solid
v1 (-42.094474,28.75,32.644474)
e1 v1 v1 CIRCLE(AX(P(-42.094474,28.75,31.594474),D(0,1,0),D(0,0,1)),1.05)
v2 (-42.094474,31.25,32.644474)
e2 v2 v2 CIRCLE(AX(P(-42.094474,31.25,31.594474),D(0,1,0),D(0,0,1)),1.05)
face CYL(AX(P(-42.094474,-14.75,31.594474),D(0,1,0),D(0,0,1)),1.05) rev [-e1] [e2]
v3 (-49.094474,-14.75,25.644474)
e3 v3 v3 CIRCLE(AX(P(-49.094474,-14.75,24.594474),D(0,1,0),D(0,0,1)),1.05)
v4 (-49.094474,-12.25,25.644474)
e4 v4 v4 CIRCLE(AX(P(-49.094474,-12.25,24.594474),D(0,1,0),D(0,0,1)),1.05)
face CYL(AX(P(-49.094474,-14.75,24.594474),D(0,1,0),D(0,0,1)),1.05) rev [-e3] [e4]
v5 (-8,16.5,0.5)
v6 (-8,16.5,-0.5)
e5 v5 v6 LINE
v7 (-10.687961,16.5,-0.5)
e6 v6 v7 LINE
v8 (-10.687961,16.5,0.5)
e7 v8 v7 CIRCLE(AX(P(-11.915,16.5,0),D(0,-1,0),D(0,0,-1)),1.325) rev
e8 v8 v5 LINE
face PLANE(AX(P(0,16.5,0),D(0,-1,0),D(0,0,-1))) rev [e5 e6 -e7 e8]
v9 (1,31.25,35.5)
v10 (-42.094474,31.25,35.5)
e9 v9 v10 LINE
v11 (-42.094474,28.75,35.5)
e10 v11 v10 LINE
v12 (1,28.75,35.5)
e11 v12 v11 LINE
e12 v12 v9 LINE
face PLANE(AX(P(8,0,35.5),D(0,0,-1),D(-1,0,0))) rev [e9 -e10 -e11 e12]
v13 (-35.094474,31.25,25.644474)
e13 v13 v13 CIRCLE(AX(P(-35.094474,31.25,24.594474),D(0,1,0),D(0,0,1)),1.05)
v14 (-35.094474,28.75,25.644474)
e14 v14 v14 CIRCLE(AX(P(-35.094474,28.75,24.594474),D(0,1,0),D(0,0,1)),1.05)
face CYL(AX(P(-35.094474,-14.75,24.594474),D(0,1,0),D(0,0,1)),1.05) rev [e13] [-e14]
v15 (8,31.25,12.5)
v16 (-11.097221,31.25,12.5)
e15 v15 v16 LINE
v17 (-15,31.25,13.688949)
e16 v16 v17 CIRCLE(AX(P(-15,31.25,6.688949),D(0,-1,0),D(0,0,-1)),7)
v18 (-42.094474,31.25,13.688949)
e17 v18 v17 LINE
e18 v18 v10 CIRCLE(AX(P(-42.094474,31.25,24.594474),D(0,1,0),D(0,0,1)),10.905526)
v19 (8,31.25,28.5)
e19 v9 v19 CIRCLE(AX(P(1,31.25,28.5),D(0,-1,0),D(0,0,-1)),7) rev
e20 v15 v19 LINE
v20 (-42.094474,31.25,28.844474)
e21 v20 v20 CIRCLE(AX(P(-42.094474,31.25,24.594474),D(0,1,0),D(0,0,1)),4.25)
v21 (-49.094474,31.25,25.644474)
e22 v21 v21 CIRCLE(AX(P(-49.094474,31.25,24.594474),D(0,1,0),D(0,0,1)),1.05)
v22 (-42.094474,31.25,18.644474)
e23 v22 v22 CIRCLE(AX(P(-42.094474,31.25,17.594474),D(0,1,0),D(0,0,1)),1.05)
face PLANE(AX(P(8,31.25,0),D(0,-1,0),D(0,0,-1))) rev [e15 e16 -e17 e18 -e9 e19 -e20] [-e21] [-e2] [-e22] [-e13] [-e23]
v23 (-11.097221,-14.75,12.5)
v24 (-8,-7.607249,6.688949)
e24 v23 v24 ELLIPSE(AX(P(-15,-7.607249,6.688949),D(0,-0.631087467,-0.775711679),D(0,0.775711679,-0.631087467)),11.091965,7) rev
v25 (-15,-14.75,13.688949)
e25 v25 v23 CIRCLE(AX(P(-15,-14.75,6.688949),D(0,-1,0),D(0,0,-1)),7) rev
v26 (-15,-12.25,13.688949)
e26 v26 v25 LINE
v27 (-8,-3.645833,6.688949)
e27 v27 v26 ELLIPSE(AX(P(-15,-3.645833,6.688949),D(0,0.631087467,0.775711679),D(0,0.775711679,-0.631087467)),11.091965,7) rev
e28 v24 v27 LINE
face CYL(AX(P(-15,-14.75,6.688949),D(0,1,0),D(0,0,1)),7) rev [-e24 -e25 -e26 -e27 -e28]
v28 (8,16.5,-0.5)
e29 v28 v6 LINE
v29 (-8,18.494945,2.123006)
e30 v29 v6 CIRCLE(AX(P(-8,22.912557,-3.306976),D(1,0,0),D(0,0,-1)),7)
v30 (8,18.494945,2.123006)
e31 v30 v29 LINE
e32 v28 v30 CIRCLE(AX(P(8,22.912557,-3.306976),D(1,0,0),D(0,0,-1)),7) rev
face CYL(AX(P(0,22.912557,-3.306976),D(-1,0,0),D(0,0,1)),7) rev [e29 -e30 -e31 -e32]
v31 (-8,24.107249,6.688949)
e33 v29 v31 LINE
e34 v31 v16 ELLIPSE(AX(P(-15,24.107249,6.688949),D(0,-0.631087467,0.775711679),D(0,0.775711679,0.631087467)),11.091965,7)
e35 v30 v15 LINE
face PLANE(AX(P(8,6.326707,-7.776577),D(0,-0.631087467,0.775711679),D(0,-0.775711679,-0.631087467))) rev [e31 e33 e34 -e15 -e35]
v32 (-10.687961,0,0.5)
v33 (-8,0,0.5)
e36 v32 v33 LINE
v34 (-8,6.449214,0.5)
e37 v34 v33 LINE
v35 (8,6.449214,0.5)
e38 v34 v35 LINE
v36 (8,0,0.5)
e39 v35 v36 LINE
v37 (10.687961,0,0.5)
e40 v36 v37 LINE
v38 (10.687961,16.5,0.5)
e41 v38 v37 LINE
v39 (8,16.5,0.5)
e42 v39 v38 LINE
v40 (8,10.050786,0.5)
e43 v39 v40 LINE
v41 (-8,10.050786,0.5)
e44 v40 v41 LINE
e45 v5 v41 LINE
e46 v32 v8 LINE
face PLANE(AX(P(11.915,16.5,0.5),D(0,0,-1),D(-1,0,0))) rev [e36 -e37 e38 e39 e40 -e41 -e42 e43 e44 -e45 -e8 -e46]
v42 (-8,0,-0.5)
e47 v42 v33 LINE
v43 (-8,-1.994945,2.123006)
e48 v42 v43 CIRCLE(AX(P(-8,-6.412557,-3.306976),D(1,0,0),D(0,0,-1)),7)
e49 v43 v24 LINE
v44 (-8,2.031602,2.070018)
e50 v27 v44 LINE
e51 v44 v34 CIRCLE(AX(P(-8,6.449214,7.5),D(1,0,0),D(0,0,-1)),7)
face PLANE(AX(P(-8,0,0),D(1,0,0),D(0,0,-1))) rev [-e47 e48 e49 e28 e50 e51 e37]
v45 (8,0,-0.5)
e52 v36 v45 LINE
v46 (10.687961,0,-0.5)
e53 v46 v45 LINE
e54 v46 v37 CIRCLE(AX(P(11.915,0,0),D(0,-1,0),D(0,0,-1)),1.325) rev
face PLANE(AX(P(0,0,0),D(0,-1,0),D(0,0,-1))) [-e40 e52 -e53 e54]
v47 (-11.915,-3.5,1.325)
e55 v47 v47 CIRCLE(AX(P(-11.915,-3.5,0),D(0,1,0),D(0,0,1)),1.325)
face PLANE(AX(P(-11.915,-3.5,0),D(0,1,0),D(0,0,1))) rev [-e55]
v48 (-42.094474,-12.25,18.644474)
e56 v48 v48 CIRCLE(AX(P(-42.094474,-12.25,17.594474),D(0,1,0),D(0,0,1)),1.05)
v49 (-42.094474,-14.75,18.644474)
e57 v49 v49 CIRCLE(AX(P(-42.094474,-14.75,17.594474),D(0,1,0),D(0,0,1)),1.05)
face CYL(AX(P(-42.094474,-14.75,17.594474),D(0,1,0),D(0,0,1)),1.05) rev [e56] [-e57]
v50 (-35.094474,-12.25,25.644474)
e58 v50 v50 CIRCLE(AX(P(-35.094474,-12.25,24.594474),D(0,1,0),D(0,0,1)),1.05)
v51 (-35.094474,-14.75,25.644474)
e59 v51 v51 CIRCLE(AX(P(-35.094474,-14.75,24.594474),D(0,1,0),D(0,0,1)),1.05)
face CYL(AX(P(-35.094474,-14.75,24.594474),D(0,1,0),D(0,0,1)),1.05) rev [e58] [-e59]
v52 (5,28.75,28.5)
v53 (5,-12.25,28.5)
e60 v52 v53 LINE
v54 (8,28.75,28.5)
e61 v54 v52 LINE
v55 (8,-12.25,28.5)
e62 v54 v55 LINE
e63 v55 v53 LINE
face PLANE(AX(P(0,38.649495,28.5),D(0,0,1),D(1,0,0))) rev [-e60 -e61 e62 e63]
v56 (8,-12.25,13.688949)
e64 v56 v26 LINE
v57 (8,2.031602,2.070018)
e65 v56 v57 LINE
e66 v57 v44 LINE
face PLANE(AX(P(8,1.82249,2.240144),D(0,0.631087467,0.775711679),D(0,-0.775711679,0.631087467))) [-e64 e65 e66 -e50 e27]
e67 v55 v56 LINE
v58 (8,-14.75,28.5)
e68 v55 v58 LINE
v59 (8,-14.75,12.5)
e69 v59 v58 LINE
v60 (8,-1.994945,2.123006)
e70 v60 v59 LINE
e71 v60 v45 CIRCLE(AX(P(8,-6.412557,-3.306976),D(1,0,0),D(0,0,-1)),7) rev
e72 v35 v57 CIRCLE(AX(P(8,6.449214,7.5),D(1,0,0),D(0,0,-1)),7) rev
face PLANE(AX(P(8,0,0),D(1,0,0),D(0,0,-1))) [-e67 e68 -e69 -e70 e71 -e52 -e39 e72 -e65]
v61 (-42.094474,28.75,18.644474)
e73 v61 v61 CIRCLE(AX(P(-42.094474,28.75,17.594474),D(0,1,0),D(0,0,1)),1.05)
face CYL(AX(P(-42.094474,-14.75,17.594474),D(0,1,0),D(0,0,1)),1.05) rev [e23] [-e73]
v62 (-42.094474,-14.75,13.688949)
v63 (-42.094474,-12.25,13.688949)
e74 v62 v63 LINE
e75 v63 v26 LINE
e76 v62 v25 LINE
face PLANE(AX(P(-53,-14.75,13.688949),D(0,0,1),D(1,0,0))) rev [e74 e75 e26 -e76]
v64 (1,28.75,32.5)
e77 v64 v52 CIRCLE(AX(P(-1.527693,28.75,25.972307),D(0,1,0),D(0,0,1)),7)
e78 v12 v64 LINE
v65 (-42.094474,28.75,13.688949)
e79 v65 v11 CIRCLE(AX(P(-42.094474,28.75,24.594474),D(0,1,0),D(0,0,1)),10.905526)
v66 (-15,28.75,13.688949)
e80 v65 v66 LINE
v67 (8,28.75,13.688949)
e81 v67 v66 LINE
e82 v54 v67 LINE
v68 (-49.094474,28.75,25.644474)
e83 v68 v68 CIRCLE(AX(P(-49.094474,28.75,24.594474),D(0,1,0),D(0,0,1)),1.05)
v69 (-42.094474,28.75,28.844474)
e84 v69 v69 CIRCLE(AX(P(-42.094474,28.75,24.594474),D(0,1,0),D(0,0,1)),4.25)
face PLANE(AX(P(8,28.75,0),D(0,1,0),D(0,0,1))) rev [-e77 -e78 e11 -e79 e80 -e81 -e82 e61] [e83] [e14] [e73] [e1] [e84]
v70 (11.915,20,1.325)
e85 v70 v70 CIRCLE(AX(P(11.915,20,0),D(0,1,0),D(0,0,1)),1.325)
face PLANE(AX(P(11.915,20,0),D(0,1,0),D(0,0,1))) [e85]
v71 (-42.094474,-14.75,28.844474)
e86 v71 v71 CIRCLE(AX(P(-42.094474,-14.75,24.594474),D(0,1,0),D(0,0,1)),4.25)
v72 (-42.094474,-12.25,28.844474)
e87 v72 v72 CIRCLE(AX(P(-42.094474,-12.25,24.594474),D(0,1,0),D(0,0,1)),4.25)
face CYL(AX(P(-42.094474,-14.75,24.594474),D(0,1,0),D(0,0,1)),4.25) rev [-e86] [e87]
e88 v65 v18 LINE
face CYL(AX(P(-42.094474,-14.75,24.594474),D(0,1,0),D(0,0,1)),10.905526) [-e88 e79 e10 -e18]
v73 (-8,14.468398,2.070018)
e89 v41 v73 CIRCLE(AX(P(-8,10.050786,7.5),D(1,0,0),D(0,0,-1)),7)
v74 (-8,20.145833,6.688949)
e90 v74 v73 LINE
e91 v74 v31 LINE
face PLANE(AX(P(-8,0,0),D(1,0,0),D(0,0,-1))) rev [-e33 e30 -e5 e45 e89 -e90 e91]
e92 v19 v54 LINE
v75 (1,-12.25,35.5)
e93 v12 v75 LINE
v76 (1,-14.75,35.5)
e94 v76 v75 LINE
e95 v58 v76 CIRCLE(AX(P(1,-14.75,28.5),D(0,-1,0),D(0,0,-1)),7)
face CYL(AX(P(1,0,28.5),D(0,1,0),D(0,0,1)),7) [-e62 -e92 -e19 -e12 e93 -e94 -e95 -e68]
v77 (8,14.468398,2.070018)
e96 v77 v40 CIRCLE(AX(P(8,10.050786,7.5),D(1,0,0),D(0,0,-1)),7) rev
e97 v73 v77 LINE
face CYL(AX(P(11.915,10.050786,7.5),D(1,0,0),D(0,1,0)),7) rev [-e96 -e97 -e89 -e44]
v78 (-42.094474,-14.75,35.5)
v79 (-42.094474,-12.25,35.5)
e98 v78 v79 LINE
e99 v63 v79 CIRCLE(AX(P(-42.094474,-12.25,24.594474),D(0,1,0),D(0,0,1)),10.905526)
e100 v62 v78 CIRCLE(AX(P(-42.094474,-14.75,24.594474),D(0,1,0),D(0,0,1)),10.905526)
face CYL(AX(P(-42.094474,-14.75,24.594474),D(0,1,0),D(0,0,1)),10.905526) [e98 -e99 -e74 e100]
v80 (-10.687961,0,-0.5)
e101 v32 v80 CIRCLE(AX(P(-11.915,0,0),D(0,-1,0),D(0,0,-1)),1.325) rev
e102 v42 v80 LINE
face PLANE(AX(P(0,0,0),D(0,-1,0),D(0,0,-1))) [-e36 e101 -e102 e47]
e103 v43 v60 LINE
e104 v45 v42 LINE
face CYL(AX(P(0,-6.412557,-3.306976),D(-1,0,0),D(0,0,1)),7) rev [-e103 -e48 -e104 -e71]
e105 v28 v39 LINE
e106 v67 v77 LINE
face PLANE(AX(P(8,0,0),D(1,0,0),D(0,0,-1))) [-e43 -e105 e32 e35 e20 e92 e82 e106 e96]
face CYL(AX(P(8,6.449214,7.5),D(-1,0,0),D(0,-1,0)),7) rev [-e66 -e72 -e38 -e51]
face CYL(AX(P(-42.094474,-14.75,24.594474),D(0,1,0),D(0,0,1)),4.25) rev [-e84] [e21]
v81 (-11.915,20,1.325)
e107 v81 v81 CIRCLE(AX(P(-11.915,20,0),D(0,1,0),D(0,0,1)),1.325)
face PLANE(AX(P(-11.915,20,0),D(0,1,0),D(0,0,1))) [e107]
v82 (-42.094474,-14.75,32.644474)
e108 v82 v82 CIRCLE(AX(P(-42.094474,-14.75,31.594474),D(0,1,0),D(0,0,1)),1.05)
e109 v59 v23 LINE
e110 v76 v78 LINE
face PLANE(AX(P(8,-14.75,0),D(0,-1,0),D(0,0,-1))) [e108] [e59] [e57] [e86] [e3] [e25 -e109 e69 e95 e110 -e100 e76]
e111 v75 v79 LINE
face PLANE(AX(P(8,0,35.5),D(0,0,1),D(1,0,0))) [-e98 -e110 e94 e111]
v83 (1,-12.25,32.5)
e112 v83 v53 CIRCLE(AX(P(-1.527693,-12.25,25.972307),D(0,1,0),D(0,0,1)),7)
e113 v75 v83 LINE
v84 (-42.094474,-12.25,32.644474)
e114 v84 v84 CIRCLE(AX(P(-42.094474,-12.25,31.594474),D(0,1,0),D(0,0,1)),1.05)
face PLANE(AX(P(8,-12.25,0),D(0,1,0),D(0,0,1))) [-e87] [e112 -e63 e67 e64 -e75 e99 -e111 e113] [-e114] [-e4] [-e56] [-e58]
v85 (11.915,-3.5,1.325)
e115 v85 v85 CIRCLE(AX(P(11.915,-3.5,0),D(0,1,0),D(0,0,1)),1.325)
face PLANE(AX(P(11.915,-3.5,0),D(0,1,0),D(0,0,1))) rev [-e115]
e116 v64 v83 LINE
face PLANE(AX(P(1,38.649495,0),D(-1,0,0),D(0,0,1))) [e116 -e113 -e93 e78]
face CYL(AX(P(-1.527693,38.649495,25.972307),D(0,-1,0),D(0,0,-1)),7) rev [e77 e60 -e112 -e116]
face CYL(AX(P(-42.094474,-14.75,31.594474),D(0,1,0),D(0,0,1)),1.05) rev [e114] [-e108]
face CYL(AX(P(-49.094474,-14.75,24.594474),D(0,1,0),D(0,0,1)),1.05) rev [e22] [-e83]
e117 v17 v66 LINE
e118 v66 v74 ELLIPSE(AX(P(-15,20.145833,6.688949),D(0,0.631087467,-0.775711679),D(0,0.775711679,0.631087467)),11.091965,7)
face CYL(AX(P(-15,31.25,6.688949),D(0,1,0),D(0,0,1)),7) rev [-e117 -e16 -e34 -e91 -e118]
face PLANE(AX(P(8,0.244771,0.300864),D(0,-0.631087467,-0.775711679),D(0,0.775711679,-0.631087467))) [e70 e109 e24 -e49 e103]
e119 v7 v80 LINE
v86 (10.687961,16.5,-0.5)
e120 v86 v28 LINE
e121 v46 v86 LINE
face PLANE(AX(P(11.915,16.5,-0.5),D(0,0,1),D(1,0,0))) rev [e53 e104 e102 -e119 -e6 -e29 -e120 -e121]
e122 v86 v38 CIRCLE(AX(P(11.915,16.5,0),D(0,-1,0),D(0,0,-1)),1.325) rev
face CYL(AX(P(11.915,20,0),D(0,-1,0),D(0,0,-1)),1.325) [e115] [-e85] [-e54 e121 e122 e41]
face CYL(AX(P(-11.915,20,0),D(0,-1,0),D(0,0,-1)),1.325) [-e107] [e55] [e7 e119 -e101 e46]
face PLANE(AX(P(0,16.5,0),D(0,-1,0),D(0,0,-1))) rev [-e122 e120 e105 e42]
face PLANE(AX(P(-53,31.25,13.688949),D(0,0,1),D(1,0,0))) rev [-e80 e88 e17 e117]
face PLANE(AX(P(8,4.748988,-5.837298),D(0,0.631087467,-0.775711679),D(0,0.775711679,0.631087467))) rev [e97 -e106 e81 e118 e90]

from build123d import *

# Parameters (mm, degrees)
SKETCH1_W           = 23.83
SKETCH1_H           = 1
BOSS_EXTRUDE1_DEPTH = 16.5
SKETCH2_R           = 1.325
BOSS_EXTRUDE2_DEPTH = 11.75
BOSS_EXTRUDE4_DEPTH = 8
SKETCH5_W           = 21.811051378
SKETCH5_H           = 2.5
BOSS_EXTRUDE5_DEPTH = 45
SKETCH6_R           = 4.25
SKETCH6_R_2         = 1.05
CUT_EXTRUDE1_DEPTH  = 79.646360374
FILLET1_R           = 7
FILLET2_R           = 7
FILLET3_R           = 7
BOSS_EXTRUDE6_START = 41
BOSS_EXTRUDE6_DEPTH = 41


with BuildPart() as part:
    # Sketch1 → Boss-Extrude1 (new body)
    with BuildSketch(Plane(origin=(0, 0, 0), x_dir=(1, 0, 0), z_dir=(0, 1, 0))):
        Rectangle(SKETCH1_W, SKETCH1_H)
    extrude(amount=BOSS_EXTRUDE1_DEPTH)

    # Sketch2 → Boss-Extrude2 (add, symmetric)
    with BuildSketch(Plane(origin=(0, 8.25, 0), x_dir=(1, 0, 0), z_dir=(0, 1, 0))):
        with Locations(Location((-11.915, 0, 0), (0, 0, 270))):
            Circle(SKETCH2_R)
        with Locations(Location((11.915, 0, 0), (0, 0, 270))):
            Circle(SKETCH2_R)
    extrude(amount=BOSS_EXTRUDE2_DEPTH, both=True)

    # Sketch4 → Boss-Extrude4 (add, symmetric)
    with BuildSketch(Plane(origin=(0, 0, 0), x_dir=(0, 0, -1), z_dir=(1, 0, 0))):
        Polygon((-0.5, 12.538583985), (-0.5, 16.5), (-12.5, 31.25), (-35.5, 31.25), (-35.5, 28.75), (-13.688948622, 28.75), align=None)
        Polygon((-0.5, 0), (-0.5, 3.961416015), (-13.688948622, -12.25), (-35.5, -12.25), (-35.5, -14.75), (-12.5, -14.75), align=None)
    extrude(amount=BOSS_EXTRUDE4_DEPTH, both=True)

    # Sketch5 → Boss-Extrude5 (add)
    with BuildSketch(Plane.ZY.offset(8)):
        with Locations((24.594474311, 30)):
            Rectangle(SKETCH5_W, SKETCH5_H)
        with Locations((24.594474311, -13.5)):
            Rectangle(SKETCH5_W, SKETCH5_H)
    extrude(amount=BOSS_EXTRUDE5_DEPTH)

    # Sketch6 → Cut-Extrude1 (cut, through all)
    with BuildSketch(Plane(origin=(0, 31.25, 0), x_dir=(1, 0, 0), z_dir=(0, 1, 0))):
        with Locations(Location((-42.094474311, -24.594474311, 0), (0, 0, 270))):
            Circle(SKETCH6_R)
        with Locations(Location((-49.094474311, -24.594474311, 0), (0, 0, 270))):
            Circle(SKETCH6_R_2)
        with Locations(Location((-42.094474311, -17.594474311, 0), (0, 0, 270))):
            Circle(SKETCH6_R_2)
        with Locations(Location((-35.094474311, -24.594474311, 0), (0, 0, 270))):
            Circle(SKETCH6_R_2)
        with Locations(Location((-42.094474311, -31.594474311, 0), (0, 0, 270))):
            Circle(SKETCH6_R_2)
        with BuildLine():
            ThreePointArc((-53, -24.594474311), (-49.805845478, -16.883103144), (-42.094474311, -13.688948622))
            Line((-42.094474311, -13.688948622), (-53, -13.688948622))
            Line((-53, -13.688948622), (-53, -24.594474311))
        make_face()
        with BuildLine():
            ThreePointArc((-42.094474311, -35.5), (-49.805845478, -32.305845478), (-53, -24.594474311))
            Line((-53, -24.594474311), (-53, -35.5))
            Line((-53, -35.5), (-42.094474311, -35.5))
        make_face()
    extrude(amount=-CUT_EXTRUDE1_DEPTH, mode=Mode.SUBTRACT)

    # Fillet1
    # the kernel refuses this fillet: 7 mm, written as the material it adds along each edge
    with BuildSketch(Plane(origin=(-8, -14.75, 13.688948622), x_dir=(-1, 0, 0), z_dir=(0, 1, 0))) as fillet1_piece_1_section:
        with BuildLine():
            CenterArc((FILLET1_R, -FILLET1_R), FILLET1_R, 90, 90)
            Line((0, -FILLET1_R), (0, 0))
            Line((0, 0), (FILLET1_R, 0))
        make_face()
    fillet1_piece_1 = extrude(amount=2.5, mode=Mode.PRIVATE)
    fillet1_piece_1 = split(fillet1_piece_1, bisect_by=Plane(origin=(-10.031790315, -14.125351158, 11.991811112), z_dir=(0, 0.6310874674162202, 0.7757116786991036)), keep=Keep.TOP, mode=Mode.PRIVATE)
    fillet1_piece_1 = split(fillet1_piece_1, bisect_by=Plane(origin=(-10.031790315, -12.54763249, 13.931090308), z_dir=(0, -0.6310874674162201, -0.7757116786991036)), keep=Keep.TOP, mode=Mode.PRIVATE)
    add(fillet1_piece_1)
    with BuildSketch(Plane(origin=(-8, -14.75, 13.688948622), x_dir=(-1, 0, 0), z_dir=(0, 1, 0))) as fillet1_piece_2_section:
        with BuildLine():
            CenterArc((FILLET1_R, -FILLET1_R), FILLET1_R, 90, 90)
            Line((0, -FILLET1_R), (0, 0))
            Line((0, 0), (FILLET1_R, 0))
        make_face()
    fillet1_piece_2 = extrude(amount=20, mode=Mode.PRIVATE)
    fillet1_piece_2 = split(fillet1_piece_2, bisect_by=Plane(origin=(-8.829123945, -11.325395044, 9.713880714), z_dir=(0, 0.6310874674162202, 0.7757116786991036)), keep=Keep.TOP, mode=Mode.PRIVATE)
    fillet1_piece_2 = split(fillet1_piece_2, bisect_by=Plane(origin=(-8.829123945, -12.25, 10.954048459), z_dir=(0, 1, 0)), keep=Keep.TOP, mode=Mode.PRIVATE)
    fillet1_piece_2 = split(fillet1_piece_2, bisect_by=Plane(origin=(-8.829123945, -9.747676376, 11.653159911), z_dir=(0, -0.6310874674162201, -0.7757116786991036)), keep=Keep.TOP, mode=Mode.PRIVATE)
    add(fillet1_piece_2)
    with BuildSketch(Plane(origin=(-8, 31.25, 13.688948622), x_dir=(0, 0, -1), z_dir=(0, -1, 0))) as fillet1_piece_3_section:
        with BuildLine():
            CenterArc((FILLET1_R, -FILLET1_R), FILLET1_R, 90, 90)
            Line((0, -FILLET1_R), (0, 0))
            Line((0, 0), (FILLET1_R, 0))
        make_face()
    fillet1_piece_3 = extrude(amount=2.5, mode=Mode.PRIVATE)
    fillet1_piece_3 = split(fillet1_piece_3, bisect_by=Plane(origin=(-10.031790315, 29.047632489, 13.931090308), z_dir=(0, 0.6310874674162203, -0.7757116786991034)), keep=Keep.TOP, mode=Mode.PRIVATE)
    fillet1_piece_3 = split(fillet1_piece_3, bisect_by=Plane(origin=(-10.031790315, 30.625351158, 11.991811112), z_dir=(0, -0.6310874674162202, 0.7757116786991036)), keep=Keep.TOP, mode=Mode.PRIVATE)
    add(fillet1_piece_3)
    with BuildSketch(Plane(origin=(-8, 31.25, 13.688948622), x_dir=(0, 0, -1), z_dir=(0, -1, 0))) as fillet1_piece_4_section:
        with BuildLine():
            CenterArc((FILLET1_R, -FILLET1_R), FILLET1_R, 90, 90)
            Line((0, -FILLET1_R), (0, 0))
            Line((0, 0), (FILLET1_R, 0))
        make_face()
    fillet1_piece_4 = extrude(amount=20, mode=Mode.PRIVATE)
    fillet1_piece_4 = split(fillet1_piece_4, bisect_by=Plane(origin=(-8.829123957, 26.247676381, 11.653159915), z_dir=(0, 0.6310874674162203, -0.7757116786991034)), keep=Keep.TOP, mode=Mode.PRIVATE)
    fillet1_piece_4 = split(fillet1_piece_4, bisect_by=Plane(origin=(-8.829123957, 27.82539505, 9.713880718), z_dir=(0, -0.6310874674162202, 0.7757116786991036)), keep=Keep.TOP, mode=Mode.PRIVATE)
    fillet1_piece_4 = split(fillet1_piece_4, bisect_by=Plane(origin=(-8.829123957, 28.75, 10.954048463), z_dir=(0, -1, 0)), keep=Keep.TOP, mode=Mode.PRIVATE)
    add(fillet1_piece_4)
    # the kernel refuses this fillet: 7 mm, written as the material it takes off along each edge
    with BuildSketch(Plane(origin=(8, 5.25, 35.5), x_dir=(0, 0, -1), z_dir=(0, -1, 0))) as fillet1_2_piece_1:
        with BuildLine():
            CenterArc((FILLET1_R, -FILLET1_R), FILLET1_R, 90, 90)
            Line((0, -FILLET1_R), (0, 0))
            Line((0, 0), (FILLET1_R, 0))
        make_face()
    extrude(amount=37.5, mode=Mode.SUBTRACT)
    with BuildSketch(Plane(origin=(8, 48.75, 35.5), x_dir=(-1, 0, 0), z_dir=(0, -1, 0))) as fillet1_2_piece_2:
        with BuildLine():
            CenterArc((FILLET1_R, FILLET1_R), FILLET1_R, 180, 90)
            Line((0, FILLET1_R), (0, 0))
            Line((0, 0), (FILLET1_R, 0))
        make_face()
    extrude(amount=37.5, mode=Mode.SUBTRACT)

    # Fillet2
    fillet2_edges = [part.edges().sort_by_distance(p)[0] for p in [
        (0, 12.538583985, 0.5),
        (0, 3.961416015, 0.5),
    ]]
    fillet(fillet2_edges, radius=FILLET2_R)

    # Fillet3
    # the kernel refuses this fillet: 7 mm, written as the material it adds along each edge
    with BuildSketch(Plane(origin=(-8, 16.5, 0.5), x_dir=(0, 0.7757116786988805, 0.6310874674164945), z_dir=(1, 0, 0))) as fillet3_piece_1:
        with BuildLine():
            CenterArc((2.571760467, -7), FILLET3_R, 90, 27.229107119)
            Line((-0.631087467, -0.775711679), (0, 0))
            Line((0, 0), (2.571760467, 0))
        make_face()
    extrude(amount=16)
    with BuildSketch(Plane(origin=(8, 0, 0.5), x_dir=(0, 0, -1), z_dir=(-1, 0, 0))) as fillet3_piece_2:
        with BuildLine():
            CenterArc((3.806975951, 6.412556901), FILLET3_R, 219.130399557, 27.229107119)
            Line((-1.6230058, 1.994944629), (0, 0))
            Line((0, 0), (1, 0))
        make_face()
    extrude(amount=16)

    # Sketch8 → Boss-Extrude6 (add)
    with BuildSketch(Plane(origin=(0, -12.25, 0), x_dir=(1, 0, 0), z_dir=(0, 1, 0)).offset(BOSS_EXTRUDE6_START)):
        with BuildLine():
            ThreePointArc((1, -35.5), (5.949747468, -33.449747468), (8, -28.5))
            Line((8, -28.5), (5, -28.5))
            ThreePointArc((5, -28.5), (3.422054899, -30.922054899), (1, -32.5))
            Line((1, -32.5), (1, -35.5))
        make_face()
    extrude(amount=-BOSS_EXTRUDE6_DEPTH)


solid = part.part
